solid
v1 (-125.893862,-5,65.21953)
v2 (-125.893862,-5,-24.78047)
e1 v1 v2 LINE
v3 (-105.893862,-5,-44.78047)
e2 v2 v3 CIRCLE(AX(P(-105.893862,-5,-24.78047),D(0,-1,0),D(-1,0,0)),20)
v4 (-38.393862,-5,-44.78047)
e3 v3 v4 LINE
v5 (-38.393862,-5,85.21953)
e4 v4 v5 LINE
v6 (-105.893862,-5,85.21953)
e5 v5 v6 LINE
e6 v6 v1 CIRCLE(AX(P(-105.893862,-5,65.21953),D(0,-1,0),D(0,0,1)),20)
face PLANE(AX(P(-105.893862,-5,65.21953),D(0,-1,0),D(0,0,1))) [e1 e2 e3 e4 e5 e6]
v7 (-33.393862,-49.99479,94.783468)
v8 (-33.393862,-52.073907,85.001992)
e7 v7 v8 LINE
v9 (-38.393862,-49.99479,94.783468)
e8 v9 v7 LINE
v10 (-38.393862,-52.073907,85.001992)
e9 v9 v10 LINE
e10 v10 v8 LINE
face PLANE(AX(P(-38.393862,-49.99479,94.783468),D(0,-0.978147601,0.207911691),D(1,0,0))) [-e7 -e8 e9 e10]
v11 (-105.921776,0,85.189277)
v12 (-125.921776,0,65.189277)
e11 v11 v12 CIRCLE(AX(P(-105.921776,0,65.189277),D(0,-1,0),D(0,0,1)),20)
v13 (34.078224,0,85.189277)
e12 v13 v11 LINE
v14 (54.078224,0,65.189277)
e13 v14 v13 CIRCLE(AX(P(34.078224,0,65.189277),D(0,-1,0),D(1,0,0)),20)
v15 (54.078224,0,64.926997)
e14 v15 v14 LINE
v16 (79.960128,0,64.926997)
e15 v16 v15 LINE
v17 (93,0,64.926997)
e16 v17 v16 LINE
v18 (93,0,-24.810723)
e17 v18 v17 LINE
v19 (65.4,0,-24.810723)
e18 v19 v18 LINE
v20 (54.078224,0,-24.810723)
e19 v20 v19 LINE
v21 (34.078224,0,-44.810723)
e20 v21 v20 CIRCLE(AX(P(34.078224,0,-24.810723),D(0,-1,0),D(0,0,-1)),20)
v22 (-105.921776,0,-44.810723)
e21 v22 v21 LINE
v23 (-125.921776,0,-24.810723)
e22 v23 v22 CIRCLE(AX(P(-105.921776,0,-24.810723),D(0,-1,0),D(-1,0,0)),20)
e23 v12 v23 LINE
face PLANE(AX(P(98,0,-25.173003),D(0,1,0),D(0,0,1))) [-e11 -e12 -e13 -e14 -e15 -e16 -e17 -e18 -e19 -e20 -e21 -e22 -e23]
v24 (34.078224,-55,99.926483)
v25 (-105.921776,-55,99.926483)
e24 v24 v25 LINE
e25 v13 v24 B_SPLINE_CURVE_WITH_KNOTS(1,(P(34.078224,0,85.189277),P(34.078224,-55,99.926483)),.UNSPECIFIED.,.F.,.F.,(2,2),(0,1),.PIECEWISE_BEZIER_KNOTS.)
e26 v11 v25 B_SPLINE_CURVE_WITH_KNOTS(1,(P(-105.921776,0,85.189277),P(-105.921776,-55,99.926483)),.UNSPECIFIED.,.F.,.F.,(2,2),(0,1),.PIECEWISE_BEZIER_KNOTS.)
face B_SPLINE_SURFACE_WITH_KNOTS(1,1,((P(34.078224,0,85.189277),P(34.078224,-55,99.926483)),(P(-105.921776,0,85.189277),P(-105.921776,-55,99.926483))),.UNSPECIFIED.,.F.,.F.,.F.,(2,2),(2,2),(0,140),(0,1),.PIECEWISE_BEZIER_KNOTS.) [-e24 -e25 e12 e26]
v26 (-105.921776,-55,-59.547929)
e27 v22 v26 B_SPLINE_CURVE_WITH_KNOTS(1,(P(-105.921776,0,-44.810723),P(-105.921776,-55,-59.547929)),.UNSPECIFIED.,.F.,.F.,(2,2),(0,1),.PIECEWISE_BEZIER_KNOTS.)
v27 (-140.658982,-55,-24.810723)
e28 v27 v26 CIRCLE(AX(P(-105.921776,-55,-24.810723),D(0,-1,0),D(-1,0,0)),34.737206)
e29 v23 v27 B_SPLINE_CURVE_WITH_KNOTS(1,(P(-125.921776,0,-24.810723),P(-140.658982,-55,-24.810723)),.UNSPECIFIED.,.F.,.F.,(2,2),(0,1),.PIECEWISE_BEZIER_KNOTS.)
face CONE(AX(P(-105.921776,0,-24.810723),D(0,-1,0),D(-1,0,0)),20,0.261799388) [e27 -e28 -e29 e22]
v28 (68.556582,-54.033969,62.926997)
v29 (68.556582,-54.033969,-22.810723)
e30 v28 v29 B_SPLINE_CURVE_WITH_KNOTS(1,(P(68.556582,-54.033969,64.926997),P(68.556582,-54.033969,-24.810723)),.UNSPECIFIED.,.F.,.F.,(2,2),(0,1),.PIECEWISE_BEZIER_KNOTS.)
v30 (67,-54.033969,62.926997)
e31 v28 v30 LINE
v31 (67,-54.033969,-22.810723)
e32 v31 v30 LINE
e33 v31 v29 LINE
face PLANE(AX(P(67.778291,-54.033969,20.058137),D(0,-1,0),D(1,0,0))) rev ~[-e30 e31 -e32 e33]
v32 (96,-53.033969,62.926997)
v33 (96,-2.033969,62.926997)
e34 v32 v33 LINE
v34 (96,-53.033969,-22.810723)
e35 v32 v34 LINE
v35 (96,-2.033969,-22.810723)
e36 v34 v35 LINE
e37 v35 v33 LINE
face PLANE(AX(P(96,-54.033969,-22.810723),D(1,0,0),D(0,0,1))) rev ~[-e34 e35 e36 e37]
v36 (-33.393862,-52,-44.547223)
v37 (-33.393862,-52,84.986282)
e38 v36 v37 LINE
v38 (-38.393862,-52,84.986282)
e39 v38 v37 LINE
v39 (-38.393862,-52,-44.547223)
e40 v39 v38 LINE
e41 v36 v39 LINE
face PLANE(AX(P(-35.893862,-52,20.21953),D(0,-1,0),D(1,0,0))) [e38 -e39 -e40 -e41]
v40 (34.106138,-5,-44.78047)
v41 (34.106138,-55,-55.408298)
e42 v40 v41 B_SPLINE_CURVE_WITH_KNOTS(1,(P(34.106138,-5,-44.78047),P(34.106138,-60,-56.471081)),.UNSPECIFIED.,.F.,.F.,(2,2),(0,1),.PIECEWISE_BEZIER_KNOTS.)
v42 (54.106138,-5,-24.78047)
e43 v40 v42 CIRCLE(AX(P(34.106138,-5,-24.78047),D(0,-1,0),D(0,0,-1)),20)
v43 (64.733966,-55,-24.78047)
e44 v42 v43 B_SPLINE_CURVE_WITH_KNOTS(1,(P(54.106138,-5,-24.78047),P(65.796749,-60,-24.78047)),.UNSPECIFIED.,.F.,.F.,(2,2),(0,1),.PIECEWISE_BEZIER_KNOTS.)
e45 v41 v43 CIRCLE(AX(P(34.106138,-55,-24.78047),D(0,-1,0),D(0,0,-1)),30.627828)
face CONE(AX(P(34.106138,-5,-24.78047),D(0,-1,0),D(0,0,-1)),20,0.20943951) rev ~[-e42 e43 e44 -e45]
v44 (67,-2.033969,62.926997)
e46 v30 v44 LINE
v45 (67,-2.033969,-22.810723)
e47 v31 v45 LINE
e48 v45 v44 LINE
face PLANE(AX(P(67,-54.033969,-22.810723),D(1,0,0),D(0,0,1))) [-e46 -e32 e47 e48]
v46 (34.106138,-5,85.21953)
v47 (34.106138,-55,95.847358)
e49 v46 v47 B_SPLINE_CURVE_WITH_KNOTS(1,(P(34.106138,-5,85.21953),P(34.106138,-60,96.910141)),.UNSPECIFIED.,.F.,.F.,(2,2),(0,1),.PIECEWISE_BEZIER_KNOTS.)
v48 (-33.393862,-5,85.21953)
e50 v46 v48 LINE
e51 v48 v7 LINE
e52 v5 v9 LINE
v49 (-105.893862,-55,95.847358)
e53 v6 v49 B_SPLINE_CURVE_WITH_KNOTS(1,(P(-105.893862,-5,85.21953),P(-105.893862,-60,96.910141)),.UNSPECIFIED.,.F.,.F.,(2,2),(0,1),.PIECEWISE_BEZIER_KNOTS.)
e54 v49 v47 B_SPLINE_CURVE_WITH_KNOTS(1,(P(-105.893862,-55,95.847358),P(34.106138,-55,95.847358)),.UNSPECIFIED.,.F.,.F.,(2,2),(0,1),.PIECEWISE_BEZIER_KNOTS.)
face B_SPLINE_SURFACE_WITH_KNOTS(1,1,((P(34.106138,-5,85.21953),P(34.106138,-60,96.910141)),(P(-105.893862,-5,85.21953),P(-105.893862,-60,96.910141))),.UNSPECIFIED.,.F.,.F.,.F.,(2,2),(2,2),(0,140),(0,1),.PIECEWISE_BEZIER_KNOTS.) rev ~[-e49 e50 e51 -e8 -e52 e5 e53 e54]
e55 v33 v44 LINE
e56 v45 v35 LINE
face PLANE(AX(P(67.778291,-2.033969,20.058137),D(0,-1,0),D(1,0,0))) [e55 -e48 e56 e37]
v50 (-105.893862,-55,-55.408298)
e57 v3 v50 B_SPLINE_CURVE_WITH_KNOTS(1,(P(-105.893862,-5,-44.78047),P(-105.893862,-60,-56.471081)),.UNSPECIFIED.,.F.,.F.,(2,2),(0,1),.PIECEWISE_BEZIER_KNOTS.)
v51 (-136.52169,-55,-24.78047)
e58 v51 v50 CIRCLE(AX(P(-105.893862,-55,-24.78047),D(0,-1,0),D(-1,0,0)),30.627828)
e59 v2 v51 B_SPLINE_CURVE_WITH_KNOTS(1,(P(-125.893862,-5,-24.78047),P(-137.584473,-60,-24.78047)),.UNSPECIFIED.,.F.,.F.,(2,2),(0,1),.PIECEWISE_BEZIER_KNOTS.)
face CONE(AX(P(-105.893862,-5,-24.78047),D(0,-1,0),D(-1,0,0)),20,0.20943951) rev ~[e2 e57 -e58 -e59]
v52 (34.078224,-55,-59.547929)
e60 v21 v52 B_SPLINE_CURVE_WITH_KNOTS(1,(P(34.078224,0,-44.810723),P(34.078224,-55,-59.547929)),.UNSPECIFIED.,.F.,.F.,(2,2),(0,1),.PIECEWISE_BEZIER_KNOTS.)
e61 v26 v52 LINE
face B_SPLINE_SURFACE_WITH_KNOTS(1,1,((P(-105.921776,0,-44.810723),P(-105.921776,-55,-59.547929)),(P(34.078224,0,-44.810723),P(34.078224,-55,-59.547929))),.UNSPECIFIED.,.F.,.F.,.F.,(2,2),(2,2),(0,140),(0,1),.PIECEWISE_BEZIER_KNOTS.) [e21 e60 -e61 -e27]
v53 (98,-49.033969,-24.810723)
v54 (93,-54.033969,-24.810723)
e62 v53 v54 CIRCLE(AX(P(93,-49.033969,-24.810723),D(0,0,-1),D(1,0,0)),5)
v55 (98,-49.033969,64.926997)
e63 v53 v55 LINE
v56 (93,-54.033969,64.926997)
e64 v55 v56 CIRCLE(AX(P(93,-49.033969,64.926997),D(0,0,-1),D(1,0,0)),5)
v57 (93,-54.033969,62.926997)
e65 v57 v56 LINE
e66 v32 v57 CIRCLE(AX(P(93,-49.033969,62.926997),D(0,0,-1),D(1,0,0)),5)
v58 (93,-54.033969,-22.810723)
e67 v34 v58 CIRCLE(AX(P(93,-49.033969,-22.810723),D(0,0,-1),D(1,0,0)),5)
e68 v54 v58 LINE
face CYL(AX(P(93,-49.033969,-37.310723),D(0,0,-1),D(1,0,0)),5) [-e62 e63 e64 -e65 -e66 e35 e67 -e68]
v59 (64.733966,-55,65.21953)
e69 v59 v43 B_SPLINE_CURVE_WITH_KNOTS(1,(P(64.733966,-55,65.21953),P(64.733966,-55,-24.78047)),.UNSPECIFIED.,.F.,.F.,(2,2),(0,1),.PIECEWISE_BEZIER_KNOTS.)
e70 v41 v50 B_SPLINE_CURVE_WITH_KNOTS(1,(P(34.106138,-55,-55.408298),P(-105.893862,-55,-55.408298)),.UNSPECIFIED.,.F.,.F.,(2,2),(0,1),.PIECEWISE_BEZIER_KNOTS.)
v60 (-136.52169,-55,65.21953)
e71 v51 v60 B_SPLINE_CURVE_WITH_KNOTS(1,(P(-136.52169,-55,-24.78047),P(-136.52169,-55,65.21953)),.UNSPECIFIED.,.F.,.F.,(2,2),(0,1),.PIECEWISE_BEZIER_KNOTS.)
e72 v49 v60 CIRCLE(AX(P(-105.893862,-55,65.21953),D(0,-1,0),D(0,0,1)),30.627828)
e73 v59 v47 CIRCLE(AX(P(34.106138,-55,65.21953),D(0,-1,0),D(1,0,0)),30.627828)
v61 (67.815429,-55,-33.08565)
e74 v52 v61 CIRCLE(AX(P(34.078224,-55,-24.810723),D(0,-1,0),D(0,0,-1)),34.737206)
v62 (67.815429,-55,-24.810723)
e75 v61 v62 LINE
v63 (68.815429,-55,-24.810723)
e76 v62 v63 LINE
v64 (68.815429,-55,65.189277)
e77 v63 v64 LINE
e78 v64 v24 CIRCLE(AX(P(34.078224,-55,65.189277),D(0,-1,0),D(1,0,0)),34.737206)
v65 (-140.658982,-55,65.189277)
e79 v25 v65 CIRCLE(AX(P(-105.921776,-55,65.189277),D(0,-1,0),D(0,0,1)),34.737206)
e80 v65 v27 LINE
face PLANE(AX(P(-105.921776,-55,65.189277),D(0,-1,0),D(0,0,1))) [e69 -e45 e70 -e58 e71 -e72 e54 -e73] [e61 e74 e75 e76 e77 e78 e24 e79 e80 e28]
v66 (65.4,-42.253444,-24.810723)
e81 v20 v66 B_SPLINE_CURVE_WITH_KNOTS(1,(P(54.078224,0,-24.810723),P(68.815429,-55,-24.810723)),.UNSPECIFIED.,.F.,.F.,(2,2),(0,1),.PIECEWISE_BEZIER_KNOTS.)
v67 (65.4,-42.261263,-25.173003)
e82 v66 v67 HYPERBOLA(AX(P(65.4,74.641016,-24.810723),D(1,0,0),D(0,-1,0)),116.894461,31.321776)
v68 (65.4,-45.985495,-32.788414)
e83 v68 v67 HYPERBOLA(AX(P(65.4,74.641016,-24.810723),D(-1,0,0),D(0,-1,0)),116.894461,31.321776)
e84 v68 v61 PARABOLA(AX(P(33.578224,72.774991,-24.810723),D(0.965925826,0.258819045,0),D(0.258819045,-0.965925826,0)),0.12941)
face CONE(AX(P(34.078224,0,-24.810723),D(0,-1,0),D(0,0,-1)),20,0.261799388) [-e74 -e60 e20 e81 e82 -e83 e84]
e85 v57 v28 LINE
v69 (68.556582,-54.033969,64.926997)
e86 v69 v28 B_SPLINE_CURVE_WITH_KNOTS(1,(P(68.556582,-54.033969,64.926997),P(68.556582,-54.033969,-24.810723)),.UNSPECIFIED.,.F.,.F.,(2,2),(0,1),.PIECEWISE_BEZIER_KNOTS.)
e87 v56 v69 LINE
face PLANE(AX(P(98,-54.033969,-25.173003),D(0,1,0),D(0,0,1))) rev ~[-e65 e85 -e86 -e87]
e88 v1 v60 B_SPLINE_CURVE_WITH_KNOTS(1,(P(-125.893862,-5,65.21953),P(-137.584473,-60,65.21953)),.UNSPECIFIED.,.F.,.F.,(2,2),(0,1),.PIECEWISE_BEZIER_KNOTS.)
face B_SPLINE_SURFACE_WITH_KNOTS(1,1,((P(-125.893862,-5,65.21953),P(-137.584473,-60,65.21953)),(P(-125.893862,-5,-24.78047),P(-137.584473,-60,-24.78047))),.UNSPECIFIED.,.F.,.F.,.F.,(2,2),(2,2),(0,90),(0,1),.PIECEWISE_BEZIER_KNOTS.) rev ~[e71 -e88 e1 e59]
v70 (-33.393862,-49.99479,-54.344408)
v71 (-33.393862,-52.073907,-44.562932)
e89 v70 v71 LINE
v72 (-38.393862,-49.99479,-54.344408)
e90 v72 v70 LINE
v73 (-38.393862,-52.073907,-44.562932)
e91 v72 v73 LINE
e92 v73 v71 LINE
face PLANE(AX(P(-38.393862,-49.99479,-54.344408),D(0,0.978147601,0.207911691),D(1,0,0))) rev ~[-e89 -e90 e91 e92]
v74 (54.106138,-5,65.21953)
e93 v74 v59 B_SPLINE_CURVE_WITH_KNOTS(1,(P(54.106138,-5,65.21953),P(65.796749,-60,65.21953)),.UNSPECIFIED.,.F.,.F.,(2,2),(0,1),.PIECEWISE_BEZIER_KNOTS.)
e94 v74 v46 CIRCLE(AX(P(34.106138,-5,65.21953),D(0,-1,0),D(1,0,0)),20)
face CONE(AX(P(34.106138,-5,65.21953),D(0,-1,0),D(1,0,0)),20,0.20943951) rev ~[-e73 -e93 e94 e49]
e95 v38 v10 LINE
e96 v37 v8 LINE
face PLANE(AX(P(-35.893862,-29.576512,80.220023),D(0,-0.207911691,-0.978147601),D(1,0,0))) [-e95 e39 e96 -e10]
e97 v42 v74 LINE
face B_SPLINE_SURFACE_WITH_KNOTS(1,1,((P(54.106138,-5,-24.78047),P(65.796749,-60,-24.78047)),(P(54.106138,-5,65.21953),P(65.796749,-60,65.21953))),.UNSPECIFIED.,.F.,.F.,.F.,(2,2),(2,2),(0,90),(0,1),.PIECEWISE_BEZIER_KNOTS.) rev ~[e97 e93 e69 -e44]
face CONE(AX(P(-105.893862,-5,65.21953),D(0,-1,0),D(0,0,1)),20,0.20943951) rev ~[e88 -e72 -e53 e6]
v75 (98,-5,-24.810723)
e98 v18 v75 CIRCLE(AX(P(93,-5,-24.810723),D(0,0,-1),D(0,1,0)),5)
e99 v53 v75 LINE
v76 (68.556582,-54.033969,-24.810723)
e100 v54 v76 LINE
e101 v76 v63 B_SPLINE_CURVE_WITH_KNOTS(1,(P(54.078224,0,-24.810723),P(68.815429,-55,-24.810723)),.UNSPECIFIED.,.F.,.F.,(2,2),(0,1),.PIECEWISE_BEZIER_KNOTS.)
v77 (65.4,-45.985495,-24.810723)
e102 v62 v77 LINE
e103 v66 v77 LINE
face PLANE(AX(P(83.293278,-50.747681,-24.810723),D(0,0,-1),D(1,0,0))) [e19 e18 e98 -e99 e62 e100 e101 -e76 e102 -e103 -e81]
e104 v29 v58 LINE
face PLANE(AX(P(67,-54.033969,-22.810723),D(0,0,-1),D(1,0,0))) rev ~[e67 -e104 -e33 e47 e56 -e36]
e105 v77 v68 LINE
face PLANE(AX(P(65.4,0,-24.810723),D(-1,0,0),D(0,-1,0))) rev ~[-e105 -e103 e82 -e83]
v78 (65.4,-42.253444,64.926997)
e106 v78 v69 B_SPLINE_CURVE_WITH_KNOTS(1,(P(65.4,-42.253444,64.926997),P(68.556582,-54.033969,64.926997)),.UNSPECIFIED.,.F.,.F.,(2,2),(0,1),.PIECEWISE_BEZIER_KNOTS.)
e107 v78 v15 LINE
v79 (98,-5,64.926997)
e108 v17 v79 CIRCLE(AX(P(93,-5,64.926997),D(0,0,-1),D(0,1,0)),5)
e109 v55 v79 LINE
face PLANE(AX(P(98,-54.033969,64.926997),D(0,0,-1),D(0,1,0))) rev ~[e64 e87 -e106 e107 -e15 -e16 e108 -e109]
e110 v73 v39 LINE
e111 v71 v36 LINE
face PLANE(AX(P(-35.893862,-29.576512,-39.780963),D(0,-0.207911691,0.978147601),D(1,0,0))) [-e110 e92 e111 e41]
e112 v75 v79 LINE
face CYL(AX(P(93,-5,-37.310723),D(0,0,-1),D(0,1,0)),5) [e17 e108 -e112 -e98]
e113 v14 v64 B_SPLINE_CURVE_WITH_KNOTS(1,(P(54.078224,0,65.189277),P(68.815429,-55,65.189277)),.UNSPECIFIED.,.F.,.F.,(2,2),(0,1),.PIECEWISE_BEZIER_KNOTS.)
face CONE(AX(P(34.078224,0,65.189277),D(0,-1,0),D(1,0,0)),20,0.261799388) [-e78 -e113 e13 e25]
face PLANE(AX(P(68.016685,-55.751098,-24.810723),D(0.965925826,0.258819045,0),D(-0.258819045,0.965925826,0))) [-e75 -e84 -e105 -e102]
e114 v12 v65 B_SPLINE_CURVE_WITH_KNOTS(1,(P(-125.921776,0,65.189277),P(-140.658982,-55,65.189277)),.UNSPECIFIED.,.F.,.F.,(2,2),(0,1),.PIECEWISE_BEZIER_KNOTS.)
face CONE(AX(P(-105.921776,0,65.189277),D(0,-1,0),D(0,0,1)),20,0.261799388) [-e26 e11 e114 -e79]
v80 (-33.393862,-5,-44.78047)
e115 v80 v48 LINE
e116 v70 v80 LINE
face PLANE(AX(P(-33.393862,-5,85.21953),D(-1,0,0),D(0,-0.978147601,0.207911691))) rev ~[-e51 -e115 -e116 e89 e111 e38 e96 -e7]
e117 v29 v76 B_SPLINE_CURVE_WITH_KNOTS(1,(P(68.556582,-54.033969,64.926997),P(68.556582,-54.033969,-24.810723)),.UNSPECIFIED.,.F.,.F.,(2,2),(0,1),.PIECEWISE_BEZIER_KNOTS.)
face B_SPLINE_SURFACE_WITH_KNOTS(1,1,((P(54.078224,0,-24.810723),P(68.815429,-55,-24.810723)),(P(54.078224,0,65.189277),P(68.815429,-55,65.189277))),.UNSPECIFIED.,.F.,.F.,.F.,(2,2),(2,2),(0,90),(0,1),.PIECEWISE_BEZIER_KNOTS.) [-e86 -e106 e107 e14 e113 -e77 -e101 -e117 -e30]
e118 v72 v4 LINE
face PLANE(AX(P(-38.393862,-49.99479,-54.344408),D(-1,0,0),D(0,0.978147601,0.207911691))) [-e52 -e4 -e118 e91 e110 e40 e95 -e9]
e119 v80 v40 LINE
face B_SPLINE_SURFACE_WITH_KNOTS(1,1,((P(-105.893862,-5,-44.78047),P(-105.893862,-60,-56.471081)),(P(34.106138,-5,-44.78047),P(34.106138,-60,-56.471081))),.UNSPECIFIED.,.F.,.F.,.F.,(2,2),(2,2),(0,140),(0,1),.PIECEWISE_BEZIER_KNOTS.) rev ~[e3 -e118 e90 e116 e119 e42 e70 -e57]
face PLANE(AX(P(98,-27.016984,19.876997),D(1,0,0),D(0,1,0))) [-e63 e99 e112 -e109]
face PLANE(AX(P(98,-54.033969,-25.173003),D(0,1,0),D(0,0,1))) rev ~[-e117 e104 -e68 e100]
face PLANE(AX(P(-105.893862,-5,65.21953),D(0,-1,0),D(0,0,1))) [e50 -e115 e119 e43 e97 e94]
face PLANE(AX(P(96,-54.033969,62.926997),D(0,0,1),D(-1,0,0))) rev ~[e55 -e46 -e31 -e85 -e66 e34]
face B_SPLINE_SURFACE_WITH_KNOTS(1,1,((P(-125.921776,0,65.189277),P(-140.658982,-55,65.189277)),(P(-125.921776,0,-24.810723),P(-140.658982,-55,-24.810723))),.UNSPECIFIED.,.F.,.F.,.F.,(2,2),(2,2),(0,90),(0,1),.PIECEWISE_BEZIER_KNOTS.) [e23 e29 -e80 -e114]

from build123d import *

# Parameters (mm, degrees)
F1_DEPTH     = 55
F1_TAPER     = -15
F4_DEPTH     = 55
F4_TAPER     = -12
F5_W         = 5
F5_H         = 130
F6_DEPTH     = 47
F10_W        = 360.01701653
F10_H        = 225.87454319
F11_DEPTH    = 25
F12_W        = 5
F12_H        = 46
F13_DEPTH    = 10
F14_W        = 5
F14_H        = 46
F15_DEPTH    = 10
F8_W         = 54.0339685977
F8_H         = 90.1
F16_DEPTH    = 32.6
F9_W         = 55.9400806222
F9_H         = 89.7377200425
F17_DEPTH    = 25
F18_W        = 347.7291613817
F18_H        = 217.2330617905
F19_DEPTH    = 25
F20_W        = 34.4053636551
F20_H        = 45.9854951713
F21_DEPTH    = 25
F22_W        = 1.5565819549
F22_H        = 85.7377200425
F22_W_2      = 27.4434180451
F23_DEPTH    = 52
F24_T1_DEPTH = 114.7377200425


# Not quite as in the source:
# - a fillet or chamfer that OpenCascade refuses, or shapes differently, is made with other operations: its cross-section is extruded or revolved along the edge and cut away or added


with BuildPart() as f1:
    # F0 (on Front) → F1 (new body)
    with BuildSketch(Plane.XZ):
        with BuildLine():
            Line((34.0782237053, 85.1892769337), (-105.9217762947, 85.1892769337))
            ThreePointArc((-105.9217762947, 85.1892769337), (-120.0639119184, 79.3314125574), (-125.9217762947, 65.1892769337))
            Line((-125.9217762947, 65.1892769337), (-125.9217762947, -24.8107230663))
            ThreePointArc((-125.9217762947, -24.8107230663), (-120.0639119184, -38.9528586901), (-105.9217762947, -44.8107230663))
            Line((-105.9217762947, -44.8107230663), (34.0782237053, -44.8107230663))
            ThreePointArc((34.0782237053, -44.8107230663), (48.220359329, -38.9528586901), (54.0782237053, -24.8107230663))
            Line((54.0782237053, -24.8107230663), (54.0782237053, 65.1892769337))
            ThreePointArc((54.0782237053, 65.1892769337), (48.220359329, 79.3314125574), (34.0782237053, 85.1892769337))
        make_face()
    extrude(amount=F1_DEPTH, taper=F1_TAPER)

    # F3 (on offset) → F4 (cut)
    with BuildSketch(Plane.XZ.offset(5)):
        with BuildLine():
            Line((34.106137666, 85.2195297501), (-105.893862334, 85.2195297501))
            ThreePointArc((-105.893862334, 85.2195297501), (-120.0359979577, 79.3616653739), (-125.893862334, 65.2195297501))
            Line((-125.893862334, 65.2195297501), (-125.893862334, -24.7804702499))
            ThreePointArc((-125.893862334, -24.7804702499), (-120.0359979577, -38.9226058736), (-105.893862334, -44.7804702499))
            Line((-105.893862334, -44.7804702499), (34.106137666, -44.7804702499))
            ThreePointArc((34.106137666, -44.7804702499), (48.2482732898, -38.9226058736), (54.106137666, -24.7804702499))
            Line((54.106137666, -24.7804702499), (54.106137666, 65.2195297501))
            ThreePointArc((54.106137666, 65.2195297501), (48.2482732898, 79.3616653739), (34.106137666, 85.2195297501))
        make_face()
    extrude(amount=F4_DEPTH, taper=F4_TAPER, mode=Mode.SUBTRACT)

    # F5 (on face) → F6 (join)
    with BuildSketch(Plane.XZ.offset(5)):
        with Locations((-35.893862334, 20.2195297501)):
            Rectangle(F5_W, F5_H)
    extrude(amount=F6_DEPTH)

    # F10 (on Front) → F11 (cut)
    with BuildSketch(Plane.XZ):
        with Locations((5.3876563907, 10.9746605158)):
            Rectangle(F10_W, F10_H)
    extrude(amount=-F11_DEPTH, mode=Mode.SUBTRACT)

    # F12 (on face) → F13 (join)
    with BuildSketch(Plane(origin=(0, 8.8907927165, -41.8278911112), x_dir=(1, 0, 0), z_dir=(0, -0.2079116908, 0.9781476007))):
        with Locations((-35.893862334, -37.2011212889)):
            Rectangle(F12_W, F12_H)
    extrude(amount=F13_DEPTH)

    # F14 (on face) → F15 (join)
    with BuildSketch(Plane(origin=(0, 17.1148163716, 80.5188804202), x_dir=(1, 0, 0), z_dir=(0, -0.2079116908, -0.9781476007))):
        with Locations((-35.893862334, 45.6088745247)):
            Rectangle(F14_W, F14_H)
    extrude(amount=F15_DEPTH)

    # F8 (on offset) → F16 (join)
    with BuildSketch(Plane.YZ.offset(98)):
        with Locations((-27.0169842988, 19.8769969761)):
            Rectangle(F8_W, F8_H)
    extrude(amount=-F16_DEPTH)

    # F9 (on face) → F17 (join)
    with BuildSketch(Plane(origin=(50.4556696128, 13.5195559263, 0), x_dir=(-0.2588190451, 0.9659258263, 0), z_dir=(0.9659258263, 0.2588190451, 0))):
        with Locations((-41.9665145313, 20.0581369549)):
            Rectangle(F9_W, F9_H)
    extrude(amount=F17_DEPTH)

    # F18 (on Front) → F19 (cut)
    with BuildSketch(Plane.XZ):
        with Locations((0.111065805, 20.1892703772)):
            Rectangle(F18_W, F18_H)
    extrude(amount=-F19_DEPTH, mode=Mode.SUBTRACT)

    # F20 (on face) → F21 (cut)
    with BuildSketch(Plane(origin=(0, 0, -24.8107230663), x_dir=(1, 0, 0), z_dir=(0, 0, -1))):
        Polygon((68.0166854944, 55.7510983837), (65.4, 45.9854951713), (99.8053636551, 45.9854951713), (100.283839941, 55.7510983837), align=None)
        with Locations((82.6026818275, 22.9927475857)):
            Rectangle(F20_W, F20_H)
    extrude(amount=F21_DEPTH, mode=Mode.SUBTRACT)

    # F22 (on face) → F23 (cut)
    with BuildSketch(Plane.XZ.offset(54.0339685977)):
        with Locations((67.7782909774, 20.0581369549)):
            Rectangle(F22_W, F22_H)
        with Locations((82.2782909774, 20.0581369549)):
            Rectangle(F22_W_2, F22_H)
    extrude(amount=-F23_DEPTH, mode=Mode.SUBTRACT)

    # F24: fillet of radius 5 on 2 edges, made by hand

    # F24_s2 → F24_t1 (cut)
    with BuildSketch(Plane.XY.offset(-37.3107230663)):
        with BuildLine():
            ThreePointArc((98, -49.0339685977), (96.5355339059, -52.5695025036), (93, -54.0339685977))
            Line((93, -54.0339685977), (98, -54.0339685977))
            Line((98, -54.0339685977), (98, -49.0339685977))
        make_face()
        with BuildLine():
            ThreePointArc((93, 0), (96.5355339059, -1.4644660941), (98, -5))
            Line((98, -5), (98, 0))
            Line((98, 0), (93, 0))
        make_face()
    extrude(amount=F24_T1_DEPTH, mode=Mode.SUBTRACT)


solid = f1.part
